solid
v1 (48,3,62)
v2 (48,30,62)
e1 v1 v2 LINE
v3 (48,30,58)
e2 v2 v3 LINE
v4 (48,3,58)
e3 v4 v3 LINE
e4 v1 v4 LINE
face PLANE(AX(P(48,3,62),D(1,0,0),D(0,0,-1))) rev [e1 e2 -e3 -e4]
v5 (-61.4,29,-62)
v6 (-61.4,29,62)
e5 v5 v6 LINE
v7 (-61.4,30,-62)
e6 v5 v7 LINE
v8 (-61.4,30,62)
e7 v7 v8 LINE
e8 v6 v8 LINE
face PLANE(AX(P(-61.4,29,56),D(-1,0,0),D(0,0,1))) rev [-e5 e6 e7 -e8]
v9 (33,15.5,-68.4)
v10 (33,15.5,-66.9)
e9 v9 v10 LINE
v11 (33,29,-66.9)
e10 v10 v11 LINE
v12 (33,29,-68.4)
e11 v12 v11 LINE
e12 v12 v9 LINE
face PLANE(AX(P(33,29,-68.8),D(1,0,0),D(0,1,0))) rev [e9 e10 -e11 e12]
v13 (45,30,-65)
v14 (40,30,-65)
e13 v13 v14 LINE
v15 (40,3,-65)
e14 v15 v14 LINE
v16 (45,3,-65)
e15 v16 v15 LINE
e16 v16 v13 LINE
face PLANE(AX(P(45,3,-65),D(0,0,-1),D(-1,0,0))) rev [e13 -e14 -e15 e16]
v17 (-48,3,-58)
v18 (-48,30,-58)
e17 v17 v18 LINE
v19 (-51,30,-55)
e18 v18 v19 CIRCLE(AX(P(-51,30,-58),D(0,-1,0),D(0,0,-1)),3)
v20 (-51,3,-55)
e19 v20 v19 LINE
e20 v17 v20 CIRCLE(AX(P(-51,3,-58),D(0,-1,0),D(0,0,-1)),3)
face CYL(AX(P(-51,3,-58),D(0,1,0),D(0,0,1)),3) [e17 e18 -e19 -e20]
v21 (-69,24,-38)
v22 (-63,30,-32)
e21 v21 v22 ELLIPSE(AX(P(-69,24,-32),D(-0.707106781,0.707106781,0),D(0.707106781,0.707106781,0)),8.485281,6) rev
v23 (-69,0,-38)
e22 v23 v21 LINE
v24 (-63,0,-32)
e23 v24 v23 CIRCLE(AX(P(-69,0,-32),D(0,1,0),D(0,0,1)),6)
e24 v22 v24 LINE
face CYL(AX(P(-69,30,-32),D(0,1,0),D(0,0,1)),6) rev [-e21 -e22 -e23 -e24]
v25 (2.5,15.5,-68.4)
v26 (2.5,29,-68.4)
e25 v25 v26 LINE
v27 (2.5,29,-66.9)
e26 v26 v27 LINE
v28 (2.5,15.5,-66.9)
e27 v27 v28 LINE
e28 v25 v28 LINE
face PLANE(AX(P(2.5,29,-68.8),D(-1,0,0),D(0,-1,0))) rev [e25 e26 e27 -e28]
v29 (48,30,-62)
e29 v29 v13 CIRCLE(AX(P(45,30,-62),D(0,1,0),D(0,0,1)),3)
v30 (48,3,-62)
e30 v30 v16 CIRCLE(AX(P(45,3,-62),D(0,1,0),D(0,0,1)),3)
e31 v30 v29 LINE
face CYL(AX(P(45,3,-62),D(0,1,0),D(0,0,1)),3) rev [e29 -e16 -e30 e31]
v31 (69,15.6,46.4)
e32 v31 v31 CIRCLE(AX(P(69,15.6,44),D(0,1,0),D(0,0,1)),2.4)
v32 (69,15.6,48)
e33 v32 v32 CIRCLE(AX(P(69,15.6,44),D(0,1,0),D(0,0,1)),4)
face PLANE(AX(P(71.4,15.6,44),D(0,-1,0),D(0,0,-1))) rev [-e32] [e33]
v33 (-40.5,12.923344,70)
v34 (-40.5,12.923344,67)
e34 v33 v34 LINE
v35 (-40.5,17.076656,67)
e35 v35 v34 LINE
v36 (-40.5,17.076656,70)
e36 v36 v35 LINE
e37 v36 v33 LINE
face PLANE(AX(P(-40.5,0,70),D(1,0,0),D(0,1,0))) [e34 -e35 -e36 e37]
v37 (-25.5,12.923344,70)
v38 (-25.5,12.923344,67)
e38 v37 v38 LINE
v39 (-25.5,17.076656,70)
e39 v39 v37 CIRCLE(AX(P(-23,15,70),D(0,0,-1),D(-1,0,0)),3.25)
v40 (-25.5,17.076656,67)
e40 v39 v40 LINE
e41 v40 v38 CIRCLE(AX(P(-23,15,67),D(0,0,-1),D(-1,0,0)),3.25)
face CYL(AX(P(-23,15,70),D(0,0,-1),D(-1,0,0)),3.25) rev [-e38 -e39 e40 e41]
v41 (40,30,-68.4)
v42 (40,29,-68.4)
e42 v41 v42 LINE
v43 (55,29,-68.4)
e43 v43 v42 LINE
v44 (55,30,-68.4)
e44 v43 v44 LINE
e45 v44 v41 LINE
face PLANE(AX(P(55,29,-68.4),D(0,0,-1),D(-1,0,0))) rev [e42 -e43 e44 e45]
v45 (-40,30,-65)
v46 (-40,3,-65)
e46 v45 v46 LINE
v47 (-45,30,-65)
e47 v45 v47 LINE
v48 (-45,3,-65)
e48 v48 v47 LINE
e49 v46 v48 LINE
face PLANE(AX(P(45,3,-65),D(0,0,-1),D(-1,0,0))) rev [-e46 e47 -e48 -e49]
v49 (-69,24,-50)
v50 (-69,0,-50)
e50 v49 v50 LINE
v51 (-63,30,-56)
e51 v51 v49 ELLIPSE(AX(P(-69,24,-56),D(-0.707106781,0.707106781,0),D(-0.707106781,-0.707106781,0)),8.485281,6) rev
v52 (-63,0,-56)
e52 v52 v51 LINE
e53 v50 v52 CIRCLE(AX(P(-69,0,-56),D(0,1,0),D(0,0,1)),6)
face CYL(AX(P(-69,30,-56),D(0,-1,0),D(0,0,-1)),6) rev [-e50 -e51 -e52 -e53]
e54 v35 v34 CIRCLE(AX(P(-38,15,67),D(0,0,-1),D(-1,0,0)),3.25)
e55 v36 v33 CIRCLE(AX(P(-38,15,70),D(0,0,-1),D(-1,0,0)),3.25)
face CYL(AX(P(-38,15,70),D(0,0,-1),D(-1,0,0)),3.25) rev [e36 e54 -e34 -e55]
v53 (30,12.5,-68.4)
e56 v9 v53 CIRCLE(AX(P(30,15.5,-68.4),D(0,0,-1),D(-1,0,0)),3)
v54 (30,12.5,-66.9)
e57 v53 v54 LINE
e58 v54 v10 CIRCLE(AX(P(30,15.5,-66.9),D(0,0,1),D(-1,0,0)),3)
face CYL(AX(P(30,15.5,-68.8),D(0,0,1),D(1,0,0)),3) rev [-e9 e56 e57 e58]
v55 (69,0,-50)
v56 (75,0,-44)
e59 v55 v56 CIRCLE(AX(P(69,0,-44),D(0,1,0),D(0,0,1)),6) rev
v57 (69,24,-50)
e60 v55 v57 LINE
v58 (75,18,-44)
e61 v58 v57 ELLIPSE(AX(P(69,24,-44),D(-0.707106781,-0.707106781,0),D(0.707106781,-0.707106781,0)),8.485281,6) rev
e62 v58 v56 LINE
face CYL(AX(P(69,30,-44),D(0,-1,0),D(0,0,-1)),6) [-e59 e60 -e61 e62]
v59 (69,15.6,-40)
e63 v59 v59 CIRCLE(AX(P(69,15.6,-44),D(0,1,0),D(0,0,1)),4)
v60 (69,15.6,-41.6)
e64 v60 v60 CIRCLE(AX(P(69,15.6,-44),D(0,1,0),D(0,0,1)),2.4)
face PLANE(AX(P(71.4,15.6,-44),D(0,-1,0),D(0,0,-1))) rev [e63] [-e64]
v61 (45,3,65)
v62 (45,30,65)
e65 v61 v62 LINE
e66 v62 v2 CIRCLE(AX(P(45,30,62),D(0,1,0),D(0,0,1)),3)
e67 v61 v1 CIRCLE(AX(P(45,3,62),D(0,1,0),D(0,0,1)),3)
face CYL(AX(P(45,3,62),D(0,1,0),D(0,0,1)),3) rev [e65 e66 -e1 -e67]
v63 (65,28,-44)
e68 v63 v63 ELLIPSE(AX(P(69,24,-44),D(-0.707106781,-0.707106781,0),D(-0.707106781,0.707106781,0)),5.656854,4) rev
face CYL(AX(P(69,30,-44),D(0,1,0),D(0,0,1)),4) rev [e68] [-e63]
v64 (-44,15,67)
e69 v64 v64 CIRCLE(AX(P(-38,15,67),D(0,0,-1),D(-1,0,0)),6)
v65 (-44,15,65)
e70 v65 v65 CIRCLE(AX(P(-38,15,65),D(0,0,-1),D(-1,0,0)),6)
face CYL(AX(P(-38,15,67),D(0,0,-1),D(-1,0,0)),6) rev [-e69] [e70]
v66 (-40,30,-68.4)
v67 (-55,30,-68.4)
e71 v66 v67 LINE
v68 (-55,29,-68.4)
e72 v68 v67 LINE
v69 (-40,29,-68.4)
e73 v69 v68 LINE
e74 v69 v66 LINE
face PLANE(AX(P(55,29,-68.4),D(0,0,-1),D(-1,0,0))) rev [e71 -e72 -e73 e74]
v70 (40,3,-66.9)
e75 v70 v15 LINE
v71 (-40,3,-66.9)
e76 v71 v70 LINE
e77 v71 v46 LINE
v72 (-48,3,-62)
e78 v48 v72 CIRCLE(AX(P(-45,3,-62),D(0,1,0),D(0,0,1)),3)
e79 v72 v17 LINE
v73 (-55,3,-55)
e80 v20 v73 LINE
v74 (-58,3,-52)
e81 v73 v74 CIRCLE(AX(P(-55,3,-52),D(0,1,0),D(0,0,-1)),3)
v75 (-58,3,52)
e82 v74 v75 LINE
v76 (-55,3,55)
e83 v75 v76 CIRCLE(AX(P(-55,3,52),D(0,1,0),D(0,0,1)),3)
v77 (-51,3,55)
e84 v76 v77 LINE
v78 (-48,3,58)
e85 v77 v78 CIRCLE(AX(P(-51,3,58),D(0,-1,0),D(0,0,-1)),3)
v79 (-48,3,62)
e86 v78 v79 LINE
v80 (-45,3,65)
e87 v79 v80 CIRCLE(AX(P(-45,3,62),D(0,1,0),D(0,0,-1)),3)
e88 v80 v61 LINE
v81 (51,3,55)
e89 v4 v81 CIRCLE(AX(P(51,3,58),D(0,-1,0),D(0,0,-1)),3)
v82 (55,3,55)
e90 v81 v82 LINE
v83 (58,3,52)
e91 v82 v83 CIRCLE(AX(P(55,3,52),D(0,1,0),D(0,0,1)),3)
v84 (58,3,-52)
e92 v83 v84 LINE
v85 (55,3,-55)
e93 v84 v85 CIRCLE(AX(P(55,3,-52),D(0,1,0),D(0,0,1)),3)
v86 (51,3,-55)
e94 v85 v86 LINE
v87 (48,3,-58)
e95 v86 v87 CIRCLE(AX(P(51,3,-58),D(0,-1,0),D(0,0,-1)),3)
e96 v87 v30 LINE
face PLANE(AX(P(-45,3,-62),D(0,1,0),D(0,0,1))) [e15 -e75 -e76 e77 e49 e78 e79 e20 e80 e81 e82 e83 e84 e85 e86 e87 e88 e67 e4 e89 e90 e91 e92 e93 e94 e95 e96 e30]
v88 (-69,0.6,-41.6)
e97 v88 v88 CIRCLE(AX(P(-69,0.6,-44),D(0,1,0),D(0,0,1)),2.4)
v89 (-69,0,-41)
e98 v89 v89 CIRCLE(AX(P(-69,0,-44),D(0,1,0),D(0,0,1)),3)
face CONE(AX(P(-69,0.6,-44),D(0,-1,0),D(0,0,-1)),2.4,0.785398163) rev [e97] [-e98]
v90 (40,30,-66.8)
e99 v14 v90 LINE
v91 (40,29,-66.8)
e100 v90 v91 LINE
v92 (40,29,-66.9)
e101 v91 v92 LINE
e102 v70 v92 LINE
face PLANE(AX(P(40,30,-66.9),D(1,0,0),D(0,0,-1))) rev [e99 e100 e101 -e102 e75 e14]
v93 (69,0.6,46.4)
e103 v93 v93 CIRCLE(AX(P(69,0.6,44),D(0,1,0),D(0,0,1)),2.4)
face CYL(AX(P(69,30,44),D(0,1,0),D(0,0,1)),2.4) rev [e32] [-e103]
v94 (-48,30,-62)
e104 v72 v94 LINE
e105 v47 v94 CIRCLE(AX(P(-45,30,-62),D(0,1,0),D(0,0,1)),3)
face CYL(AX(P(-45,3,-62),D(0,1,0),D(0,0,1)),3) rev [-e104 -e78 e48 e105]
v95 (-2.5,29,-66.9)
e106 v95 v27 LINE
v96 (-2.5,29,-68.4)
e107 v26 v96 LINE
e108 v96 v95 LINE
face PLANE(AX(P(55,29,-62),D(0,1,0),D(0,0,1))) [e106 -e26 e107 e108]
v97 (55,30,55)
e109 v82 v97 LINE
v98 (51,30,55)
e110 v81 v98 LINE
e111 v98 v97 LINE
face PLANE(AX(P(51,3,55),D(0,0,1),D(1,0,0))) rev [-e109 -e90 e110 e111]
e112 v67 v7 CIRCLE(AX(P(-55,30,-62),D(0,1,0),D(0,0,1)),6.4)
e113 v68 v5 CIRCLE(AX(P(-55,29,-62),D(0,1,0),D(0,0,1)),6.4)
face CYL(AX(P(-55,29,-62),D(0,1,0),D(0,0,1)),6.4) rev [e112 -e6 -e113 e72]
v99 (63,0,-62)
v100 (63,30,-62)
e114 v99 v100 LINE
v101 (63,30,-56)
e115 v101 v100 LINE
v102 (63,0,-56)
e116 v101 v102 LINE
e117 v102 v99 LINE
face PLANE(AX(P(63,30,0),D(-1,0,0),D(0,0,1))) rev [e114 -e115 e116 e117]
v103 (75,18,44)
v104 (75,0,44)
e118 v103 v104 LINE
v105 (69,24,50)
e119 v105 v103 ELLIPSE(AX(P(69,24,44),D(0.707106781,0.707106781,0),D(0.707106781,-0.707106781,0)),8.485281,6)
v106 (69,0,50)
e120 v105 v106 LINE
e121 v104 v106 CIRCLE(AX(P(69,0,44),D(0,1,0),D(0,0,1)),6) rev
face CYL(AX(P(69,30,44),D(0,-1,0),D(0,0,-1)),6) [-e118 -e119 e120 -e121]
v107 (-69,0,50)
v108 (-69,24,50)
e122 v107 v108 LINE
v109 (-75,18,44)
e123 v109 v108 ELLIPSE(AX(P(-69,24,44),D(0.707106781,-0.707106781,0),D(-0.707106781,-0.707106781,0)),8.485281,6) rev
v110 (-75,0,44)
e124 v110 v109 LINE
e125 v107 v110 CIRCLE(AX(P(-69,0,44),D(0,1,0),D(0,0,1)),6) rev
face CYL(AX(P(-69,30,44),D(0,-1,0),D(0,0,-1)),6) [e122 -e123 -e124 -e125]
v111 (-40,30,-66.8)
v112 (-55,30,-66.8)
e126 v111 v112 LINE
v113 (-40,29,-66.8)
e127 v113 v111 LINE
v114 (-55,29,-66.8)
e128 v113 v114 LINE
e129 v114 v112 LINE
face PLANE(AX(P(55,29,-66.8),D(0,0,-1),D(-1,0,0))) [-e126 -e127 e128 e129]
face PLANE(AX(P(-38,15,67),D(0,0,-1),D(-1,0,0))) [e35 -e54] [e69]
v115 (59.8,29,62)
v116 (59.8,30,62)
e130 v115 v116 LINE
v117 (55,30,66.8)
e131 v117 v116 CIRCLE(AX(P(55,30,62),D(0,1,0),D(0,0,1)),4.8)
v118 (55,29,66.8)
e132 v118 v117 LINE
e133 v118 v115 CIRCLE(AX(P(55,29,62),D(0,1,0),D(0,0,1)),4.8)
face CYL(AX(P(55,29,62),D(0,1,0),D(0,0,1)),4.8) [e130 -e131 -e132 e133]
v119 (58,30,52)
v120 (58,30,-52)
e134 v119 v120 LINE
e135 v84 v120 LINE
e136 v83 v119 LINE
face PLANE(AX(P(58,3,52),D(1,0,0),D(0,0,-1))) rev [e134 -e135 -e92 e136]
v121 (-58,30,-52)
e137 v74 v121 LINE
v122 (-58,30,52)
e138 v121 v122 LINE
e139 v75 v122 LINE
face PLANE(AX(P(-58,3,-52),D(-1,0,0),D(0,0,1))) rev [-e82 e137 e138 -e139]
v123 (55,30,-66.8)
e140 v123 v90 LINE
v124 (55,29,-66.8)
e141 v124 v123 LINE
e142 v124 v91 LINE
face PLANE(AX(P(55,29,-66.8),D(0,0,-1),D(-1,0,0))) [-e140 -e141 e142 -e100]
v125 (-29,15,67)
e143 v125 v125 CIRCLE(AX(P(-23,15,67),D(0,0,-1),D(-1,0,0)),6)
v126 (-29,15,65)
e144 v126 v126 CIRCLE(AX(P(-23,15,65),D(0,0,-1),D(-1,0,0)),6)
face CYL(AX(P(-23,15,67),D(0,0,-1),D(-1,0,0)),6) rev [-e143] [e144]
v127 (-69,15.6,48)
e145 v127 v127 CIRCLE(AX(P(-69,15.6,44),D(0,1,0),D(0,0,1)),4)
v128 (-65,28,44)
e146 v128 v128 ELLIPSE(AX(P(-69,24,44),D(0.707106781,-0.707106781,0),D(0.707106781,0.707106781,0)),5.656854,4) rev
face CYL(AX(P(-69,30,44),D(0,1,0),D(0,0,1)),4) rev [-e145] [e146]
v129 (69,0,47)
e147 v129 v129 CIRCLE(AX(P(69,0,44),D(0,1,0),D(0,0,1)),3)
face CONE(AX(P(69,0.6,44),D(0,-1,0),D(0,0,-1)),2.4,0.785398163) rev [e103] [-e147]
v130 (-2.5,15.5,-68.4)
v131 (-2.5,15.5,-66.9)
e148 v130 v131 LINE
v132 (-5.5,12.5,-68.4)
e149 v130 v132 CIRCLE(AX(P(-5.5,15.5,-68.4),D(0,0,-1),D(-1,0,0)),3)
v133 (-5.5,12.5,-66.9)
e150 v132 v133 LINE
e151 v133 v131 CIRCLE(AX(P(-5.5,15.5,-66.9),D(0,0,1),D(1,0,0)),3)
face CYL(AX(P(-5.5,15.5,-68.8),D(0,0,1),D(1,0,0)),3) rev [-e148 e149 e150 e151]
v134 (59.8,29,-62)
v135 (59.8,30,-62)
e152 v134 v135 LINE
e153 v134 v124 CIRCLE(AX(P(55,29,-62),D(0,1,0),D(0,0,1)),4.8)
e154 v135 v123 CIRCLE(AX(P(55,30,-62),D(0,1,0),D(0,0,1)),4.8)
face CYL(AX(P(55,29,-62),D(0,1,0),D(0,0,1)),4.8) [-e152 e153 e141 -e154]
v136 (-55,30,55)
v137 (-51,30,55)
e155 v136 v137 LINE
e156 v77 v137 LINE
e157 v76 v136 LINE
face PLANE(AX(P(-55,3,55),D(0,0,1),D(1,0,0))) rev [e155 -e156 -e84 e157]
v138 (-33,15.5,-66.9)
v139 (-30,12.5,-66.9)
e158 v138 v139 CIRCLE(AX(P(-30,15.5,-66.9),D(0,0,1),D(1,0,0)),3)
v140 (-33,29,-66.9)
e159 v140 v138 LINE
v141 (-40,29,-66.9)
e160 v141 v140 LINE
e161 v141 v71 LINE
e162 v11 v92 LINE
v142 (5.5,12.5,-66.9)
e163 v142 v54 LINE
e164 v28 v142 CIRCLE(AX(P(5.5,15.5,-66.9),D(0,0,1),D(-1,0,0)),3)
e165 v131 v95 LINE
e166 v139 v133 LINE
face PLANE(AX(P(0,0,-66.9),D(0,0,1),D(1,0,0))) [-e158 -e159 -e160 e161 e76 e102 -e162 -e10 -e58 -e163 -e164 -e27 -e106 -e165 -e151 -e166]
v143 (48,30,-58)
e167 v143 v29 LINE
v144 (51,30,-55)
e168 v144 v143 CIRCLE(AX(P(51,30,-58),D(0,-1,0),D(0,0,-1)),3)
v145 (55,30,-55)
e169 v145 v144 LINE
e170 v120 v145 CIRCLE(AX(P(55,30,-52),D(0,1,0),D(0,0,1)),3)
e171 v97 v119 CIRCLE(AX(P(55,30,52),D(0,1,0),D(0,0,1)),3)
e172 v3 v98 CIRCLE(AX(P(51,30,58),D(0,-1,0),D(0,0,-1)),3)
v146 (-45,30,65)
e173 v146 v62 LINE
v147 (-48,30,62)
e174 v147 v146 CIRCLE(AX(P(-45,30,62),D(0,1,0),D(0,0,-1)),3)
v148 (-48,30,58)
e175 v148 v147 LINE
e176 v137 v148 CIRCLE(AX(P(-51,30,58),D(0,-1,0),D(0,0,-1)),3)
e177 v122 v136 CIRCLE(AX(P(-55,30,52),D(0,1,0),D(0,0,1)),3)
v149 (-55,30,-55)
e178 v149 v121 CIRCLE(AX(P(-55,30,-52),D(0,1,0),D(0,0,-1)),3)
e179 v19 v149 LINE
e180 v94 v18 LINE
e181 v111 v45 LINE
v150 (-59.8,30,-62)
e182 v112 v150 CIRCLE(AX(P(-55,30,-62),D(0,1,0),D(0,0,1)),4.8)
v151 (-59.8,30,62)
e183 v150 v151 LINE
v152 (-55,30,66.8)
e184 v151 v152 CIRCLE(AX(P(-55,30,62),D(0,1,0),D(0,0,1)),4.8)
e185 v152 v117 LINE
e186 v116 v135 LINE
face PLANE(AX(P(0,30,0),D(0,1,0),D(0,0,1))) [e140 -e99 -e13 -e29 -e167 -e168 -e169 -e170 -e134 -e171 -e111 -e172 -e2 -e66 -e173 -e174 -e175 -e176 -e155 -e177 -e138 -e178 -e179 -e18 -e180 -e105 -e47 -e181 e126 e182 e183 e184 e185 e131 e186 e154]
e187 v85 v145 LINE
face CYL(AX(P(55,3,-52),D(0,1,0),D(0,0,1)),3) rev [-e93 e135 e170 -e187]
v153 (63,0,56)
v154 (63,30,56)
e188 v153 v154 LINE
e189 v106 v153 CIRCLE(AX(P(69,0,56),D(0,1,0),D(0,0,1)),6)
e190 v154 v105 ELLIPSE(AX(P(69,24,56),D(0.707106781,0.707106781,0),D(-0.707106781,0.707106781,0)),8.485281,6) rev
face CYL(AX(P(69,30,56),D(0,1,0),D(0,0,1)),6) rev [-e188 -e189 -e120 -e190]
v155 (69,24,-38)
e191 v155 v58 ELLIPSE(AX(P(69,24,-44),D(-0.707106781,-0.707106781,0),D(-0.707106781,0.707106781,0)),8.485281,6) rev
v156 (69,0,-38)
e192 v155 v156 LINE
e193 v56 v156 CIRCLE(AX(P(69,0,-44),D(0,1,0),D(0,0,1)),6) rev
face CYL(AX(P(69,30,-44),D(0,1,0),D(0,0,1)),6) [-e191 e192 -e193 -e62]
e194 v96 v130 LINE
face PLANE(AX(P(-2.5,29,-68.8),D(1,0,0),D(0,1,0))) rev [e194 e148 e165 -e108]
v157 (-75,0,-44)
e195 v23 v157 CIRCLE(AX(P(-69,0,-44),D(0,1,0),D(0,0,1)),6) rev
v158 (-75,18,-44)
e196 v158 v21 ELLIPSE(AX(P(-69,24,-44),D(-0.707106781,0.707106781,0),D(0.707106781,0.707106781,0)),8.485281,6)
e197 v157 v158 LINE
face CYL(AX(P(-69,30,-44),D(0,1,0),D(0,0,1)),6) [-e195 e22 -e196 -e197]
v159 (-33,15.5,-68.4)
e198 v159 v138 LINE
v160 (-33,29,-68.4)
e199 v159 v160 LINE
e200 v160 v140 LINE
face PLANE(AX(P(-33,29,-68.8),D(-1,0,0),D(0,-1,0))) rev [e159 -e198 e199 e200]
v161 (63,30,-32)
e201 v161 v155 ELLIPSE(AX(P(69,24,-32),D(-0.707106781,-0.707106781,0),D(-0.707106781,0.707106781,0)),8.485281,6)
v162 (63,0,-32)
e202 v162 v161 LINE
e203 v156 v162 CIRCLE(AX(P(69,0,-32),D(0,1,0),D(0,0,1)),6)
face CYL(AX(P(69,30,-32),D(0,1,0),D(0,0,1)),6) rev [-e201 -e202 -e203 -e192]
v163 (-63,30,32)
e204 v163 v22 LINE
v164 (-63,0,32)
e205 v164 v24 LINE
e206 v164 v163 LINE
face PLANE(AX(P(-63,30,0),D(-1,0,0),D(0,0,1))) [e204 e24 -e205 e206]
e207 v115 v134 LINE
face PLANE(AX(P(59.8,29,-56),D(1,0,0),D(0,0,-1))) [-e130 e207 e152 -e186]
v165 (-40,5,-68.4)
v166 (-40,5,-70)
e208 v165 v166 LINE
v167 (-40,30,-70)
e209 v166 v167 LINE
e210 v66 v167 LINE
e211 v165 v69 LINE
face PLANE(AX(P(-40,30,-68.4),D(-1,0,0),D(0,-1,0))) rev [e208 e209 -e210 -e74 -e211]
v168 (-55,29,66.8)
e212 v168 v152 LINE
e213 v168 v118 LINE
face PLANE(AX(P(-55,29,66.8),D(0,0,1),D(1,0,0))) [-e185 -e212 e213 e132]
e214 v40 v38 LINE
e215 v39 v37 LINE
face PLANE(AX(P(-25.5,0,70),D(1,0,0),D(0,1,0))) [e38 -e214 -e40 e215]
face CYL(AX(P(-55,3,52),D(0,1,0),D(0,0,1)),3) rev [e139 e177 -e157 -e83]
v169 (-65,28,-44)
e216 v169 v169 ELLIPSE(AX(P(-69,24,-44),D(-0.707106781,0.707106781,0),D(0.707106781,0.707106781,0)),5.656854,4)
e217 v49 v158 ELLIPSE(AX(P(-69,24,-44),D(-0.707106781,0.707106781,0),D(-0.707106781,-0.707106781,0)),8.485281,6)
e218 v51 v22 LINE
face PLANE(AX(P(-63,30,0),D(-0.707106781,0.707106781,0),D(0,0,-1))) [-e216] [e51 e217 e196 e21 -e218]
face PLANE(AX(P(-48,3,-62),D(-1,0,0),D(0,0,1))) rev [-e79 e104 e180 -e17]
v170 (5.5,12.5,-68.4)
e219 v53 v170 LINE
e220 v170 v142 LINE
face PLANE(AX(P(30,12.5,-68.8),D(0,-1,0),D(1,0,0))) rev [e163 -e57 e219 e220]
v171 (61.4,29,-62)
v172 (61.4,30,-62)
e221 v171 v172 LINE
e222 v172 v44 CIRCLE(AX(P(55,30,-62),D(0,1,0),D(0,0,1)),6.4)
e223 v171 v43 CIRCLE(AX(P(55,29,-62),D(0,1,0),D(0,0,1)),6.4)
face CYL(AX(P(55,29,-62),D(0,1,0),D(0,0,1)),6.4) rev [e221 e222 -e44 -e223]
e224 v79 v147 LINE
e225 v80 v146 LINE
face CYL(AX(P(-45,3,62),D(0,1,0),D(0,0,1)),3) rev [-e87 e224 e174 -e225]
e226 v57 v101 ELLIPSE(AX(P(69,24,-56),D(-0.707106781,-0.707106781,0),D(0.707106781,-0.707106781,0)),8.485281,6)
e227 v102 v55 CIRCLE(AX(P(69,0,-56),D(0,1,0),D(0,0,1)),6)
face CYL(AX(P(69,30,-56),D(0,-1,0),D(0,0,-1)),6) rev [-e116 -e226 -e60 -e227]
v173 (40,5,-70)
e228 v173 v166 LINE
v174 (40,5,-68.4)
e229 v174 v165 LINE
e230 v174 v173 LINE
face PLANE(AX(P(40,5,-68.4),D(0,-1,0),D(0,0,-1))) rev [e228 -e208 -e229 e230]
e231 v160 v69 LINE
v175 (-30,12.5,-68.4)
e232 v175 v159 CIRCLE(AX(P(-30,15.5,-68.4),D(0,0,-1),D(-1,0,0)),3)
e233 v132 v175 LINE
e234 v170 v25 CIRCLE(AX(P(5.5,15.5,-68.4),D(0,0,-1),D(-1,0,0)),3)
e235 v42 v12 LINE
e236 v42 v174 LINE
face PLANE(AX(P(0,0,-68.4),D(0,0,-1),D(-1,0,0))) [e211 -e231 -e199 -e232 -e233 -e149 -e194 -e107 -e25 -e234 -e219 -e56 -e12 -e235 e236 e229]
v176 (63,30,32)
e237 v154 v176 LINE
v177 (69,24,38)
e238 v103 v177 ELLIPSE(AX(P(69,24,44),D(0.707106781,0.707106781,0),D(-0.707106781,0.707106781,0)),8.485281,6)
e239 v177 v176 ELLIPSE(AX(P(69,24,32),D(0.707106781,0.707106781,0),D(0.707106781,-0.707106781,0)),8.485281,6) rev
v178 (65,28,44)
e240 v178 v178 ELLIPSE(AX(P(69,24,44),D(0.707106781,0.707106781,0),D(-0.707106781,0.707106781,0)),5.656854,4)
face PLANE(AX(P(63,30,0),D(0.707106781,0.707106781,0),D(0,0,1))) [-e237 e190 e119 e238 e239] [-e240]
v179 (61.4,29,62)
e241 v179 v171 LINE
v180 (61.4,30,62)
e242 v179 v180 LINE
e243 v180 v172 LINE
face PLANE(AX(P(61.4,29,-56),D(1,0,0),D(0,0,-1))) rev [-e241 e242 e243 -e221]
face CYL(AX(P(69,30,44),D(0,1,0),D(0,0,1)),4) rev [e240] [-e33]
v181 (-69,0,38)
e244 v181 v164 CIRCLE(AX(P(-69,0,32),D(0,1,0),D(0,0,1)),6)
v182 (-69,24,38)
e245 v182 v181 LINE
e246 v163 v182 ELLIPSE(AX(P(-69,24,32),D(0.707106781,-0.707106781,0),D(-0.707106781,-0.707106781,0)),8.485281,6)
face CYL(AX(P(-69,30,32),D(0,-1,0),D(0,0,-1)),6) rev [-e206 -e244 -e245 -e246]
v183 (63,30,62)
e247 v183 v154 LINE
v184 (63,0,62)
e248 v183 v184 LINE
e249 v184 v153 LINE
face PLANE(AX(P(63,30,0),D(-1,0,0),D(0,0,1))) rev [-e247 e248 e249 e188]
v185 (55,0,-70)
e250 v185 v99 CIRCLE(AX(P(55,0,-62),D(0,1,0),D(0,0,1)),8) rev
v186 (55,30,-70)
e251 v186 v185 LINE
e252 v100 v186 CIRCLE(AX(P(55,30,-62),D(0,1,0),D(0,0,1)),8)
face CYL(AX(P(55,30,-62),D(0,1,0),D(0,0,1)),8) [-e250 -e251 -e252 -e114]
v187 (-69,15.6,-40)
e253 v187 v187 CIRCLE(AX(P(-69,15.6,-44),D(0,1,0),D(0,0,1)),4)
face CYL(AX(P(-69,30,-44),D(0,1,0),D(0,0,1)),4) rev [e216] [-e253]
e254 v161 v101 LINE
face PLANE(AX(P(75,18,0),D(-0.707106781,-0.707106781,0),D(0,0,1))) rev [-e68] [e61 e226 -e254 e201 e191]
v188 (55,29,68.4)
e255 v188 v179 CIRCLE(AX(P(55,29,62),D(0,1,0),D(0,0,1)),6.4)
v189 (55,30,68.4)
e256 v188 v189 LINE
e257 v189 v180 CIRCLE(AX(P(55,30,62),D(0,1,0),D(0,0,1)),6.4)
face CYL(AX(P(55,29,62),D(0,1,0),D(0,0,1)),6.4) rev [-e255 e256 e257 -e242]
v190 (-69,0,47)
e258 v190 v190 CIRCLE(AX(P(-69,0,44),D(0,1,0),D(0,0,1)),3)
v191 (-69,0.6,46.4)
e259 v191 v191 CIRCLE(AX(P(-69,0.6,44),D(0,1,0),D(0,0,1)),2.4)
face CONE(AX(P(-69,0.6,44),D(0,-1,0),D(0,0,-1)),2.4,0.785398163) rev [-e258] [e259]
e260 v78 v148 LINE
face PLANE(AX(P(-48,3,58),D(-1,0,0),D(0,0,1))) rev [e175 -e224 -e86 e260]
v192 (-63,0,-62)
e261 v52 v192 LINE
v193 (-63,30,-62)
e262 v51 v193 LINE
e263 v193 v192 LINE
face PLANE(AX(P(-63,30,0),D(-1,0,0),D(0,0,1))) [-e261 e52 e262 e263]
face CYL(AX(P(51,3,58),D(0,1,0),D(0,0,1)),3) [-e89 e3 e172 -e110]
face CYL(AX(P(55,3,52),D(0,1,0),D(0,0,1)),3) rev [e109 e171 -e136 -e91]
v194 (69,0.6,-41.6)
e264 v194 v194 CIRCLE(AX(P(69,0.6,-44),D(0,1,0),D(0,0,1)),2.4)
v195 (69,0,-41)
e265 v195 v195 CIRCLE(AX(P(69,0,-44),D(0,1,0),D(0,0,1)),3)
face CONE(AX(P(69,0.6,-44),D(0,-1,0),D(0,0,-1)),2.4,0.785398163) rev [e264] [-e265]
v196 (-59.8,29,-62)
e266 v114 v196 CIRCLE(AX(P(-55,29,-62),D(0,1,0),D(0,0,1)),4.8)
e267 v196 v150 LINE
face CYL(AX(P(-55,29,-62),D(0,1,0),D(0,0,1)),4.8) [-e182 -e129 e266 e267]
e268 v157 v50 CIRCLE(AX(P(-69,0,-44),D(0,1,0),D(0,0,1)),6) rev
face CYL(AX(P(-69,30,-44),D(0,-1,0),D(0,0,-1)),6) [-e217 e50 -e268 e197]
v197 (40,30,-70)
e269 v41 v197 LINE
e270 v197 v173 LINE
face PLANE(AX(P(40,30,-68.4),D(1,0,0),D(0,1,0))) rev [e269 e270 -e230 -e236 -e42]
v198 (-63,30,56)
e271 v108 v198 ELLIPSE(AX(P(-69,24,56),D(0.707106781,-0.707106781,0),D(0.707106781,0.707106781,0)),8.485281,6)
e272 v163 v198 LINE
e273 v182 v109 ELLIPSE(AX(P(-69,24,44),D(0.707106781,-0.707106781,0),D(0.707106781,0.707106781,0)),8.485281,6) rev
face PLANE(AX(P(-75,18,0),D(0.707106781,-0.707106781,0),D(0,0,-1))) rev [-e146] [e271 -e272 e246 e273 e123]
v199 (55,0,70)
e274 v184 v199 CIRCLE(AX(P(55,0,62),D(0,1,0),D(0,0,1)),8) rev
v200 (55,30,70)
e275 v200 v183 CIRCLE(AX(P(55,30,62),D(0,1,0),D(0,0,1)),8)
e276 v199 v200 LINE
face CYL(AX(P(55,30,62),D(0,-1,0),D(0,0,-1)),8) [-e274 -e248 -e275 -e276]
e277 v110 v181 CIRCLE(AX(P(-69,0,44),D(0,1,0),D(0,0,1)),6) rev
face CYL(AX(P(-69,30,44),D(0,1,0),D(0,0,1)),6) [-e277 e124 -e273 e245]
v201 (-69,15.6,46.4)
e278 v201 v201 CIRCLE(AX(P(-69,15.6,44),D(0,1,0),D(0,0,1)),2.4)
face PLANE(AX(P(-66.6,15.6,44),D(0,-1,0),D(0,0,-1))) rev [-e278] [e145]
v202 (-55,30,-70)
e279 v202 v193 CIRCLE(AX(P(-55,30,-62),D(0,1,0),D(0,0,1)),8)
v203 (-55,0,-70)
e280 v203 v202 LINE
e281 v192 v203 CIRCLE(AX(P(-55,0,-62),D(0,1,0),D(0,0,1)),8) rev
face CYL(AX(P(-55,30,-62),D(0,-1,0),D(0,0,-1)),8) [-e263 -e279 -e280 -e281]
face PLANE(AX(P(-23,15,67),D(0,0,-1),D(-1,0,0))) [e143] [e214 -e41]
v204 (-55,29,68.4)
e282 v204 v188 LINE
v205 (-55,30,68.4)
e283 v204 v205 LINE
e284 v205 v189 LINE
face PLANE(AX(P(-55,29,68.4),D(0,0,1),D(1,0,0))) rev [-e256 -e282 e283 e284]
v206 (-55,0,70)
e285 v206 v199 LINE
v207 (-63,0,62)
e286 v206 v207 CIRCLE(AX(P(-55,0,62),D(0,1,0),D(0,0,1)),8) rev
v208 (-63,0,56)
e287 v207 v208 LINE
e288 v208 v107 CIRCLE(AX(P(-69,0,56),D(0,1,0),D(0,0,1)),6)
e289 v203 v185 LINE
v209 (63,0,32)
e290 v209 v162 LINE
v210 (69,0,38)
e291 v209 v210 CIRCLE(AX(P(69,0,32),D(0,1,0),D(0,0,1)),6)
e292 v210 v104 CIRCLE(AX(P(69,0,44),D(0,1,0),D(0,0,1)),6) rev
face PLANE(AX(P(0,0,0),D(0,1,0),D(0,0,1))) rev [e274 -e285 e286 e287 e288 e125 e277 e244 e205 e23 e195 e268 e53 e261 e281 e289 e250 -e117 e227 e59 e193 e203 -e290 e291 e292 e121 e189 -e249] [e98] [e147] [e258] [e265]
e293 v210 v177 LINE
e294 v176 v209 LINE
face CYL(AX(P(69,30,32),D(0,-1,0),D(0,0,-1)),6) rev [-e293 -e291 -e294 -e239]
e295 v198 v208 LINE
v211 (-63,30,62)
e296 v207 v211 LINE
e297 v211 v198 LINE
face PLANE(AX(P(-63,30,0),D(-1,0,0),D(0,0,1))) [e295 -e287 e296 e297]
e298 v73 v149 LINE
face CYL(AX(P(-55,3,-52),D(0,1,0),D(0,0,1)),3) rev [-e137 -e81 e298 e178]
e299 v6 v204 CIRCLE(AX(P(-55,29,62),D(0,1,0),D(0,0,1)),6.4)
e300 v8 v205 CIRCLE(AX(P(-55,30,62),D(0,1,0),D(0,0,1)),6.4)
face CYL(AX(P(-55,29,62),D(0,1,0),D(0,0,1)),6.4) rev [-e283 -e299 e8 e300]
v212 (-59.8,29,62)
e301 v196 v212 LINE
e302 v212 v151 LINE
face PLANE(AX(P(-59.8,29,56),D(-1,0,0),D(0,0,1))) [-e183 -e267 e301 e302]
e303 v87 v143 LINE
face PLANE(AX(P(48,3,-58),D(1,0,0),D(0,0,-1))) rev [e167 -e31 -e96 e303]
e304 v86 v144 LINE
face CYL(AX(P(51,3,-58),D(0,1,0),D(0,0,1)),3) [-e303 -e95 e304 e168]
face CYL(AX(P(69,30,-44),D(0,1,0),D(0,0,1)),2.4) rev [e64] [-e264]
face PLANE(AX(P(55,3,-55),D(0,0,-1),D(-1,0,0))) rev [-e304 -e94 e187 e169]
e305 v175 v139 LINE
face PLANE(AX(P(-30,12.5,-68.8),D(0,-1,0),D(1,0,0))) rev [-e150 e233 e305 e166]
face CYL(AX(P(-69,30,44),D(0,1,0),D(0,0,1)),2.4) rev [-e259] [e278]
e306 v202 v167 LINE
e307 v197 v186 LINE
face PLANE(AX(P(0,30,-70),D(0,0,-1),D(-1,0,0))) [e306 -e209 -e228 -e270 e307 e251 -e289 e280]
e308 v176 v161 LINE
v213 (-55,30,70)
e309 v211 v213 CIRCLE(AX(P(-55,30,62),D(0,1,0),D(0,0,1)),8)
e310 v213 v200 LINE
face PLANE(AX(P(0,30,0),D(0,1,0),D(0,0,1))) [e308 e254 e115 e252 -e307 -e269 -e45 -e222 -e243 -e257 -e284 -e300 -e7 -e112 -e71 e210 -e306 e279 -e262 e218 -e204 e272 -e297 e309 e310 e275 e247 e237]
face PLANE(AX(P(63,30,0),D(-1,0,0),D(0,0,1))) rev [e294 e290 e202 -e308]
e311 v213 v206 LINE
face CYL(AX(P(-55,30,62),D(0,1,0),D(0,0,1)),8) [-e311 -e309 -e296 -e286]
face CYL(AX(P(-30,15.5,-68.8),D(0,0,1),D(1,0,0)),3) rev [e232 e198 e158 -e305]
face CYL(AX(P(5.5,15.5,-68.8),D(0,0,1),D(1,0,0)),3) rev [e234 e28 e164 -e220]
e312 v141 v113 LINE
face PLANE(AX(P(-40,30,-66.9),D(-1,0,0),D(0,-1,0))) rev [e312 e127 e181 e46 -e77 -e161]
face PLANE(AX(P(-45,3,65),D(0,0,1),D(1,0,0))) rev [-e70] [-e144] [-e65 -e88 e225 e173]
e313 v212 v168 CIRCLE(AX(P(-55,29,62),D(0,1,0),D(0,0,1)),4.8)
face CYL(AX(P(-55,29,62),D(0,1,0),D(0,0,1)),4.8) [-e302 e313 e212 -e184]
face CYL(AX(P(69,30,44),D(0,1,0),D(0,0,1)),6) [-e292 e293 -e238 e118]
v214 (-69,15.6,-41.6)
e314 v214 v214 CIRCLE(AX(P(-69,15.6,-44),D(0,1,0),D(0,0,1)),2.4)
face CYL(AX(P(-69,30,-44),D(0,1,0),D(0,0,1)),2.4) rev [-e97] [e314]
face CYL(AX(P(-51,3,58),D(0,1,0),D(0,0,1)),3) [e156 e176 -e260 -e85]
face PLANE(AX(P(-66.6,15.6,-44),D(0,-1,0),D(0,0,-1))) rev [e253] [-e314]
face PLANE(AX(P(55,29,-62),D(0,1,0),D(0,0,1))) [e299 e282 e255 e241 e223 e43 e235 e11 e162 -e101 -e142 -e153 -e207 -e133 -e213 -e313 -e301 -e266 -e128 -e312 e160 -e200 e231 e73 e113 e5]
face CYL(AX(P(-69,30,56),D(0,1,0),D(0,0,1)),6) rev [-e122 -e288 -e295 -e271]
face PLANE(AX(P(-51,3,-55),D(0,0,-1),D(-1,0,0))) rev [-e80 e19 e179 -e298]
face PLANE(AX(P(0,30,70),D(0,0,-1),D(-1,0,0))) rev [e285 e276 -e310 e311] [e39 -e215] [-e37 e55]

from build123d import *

# Parameters (mm, degrees)
SKETCH1_W                                    = 12
SKETCH1_H                                    = 12
SKETCH1_W_2                                  = 126
SKETCH1_H_2                                  = 140
BOSS_EXTRUDE2_DEPTH                          = 30
CBORE_FOR_M4_HEX_SOCKET_HEAD_CAP_SCR_2_COUNT = 2
CBORE_FOR_M4_HEX_SOCKET_HEAD_CAP_SCR_2_PITCH = 138
CBORE_FOR_M4_HEX_SOCKET_HEAD_CAP_SCR_3_COUNT = 2
CBORE_FOR_M4_HEX_SOCKET_HEAD_CAP_SCR_3_PITCH = 163.670400501
CBORE_FOR_M4_HEX_SOCKET_HEAD_CAP_SCR_4_COUNT = 2
CBORE_FOR_M4_HEX_SOCKET_HEAD_CAP_SCR_4_PITCH = 88
CHAMFER1_SIZE                                = 12
FILLET1_R                                    = 8
FILLET2_R                                    = 6
CUT_EXTRUDE2_DEPTH                           = 27
CUT_EXTRUDE3_DEPTH                           = 1
SKETCH11_W                                   = 80
SKETCH11_H                                   = 25
CUT_EXTRUDE4_DEPTH                           = 1.6
SKETCH12_W                                   = 80
SKETCH12_H                                   = 27
CUT_EXTRUDE5_DEPTH                           = 1.9
CUT_EXTRUDE6_DEPTH                           = 1.9
SKETCH14_R                                   = 6
CUT_EXTRUDE8_DEPTH                           = 2
CUT_EXTRUDE9_DEPTH                           = 3


# Some blends are built 0.0001 mm under size
with BuildPart() as part:
    # Sketch1 → Boss-Extrude2 (new body)
    with BuildSketch(Plane(origin=(0, 0, 0), x_dir=(1, 0, 0), z_dir=(0, 1, 0))):
        with Locations((-69, -44)):
            Rectangle(SKETCH1_W, SKETCH1_H)
        Rectangle(SKETCH1_W_2, SKETCH1_H_2)
        with Locations((-69, 44)):
            Rectangle(SKETCH1_W, SKETCH1_H)
        with Locations((69, 44)):
            Rectangle(SKETCH1_W, SKETCH1_H)
        with Locations((69, -44)):
            Rectangle(SKETCH1_W, SKETCH1_H)
    extrude(amount=BOSS_EXTRUDE2_DEPTH)

    # Sketch3 → CBORE for M4 Hex Socket Head Cap Screw1 (revolve, cut)
    with BuildSketch(Plane(origin=(-69, 30, 44), x_dir=(0, 0, 1), z_dir=(1, 0, 0))):
        Polygon((0, 0), (0, 30), (3, 30), (2.4, 29.4), (2.4, 14.4), (4, 14.4), (4, 0), align=None)
    cbore_for_m4_hex_socket_head_cap_screw1 = revolve(axis=Axis((-69, 36.35, 44), (0, -1, 0)), mode=Mode.SUBTRACT)

    # CBORE for M4 Hex Socket Head Cap Scr 2: CBORE for M4 Hex Socket Head Cap Screw1 ×2
    with Locations(*[(i * CBORE_FOR_M4_HEX_SOCKET_HEAD_CAP_SCR_2_PITCH, 0, 0) for i in range(1, CBORE_FOR_M4_HEX_SOCKET_HEAD_CAP_SCR_2_COUNT)]):
        add(cbore_for_m4_hex_socket_head_cap_screw1, mode=Mode.SUBTRACT)

    # CBORE for M4 Hex Socket Head Cap Scr 3: CBORE for M4 Hex Socket Head Cap Screw1 ×2
    with Locations(*[Vector(0.8431579538999365, 0, -0.537665941617351) * (i * CBORE_FOR_M4_HEX_SOCKET_HEAD_CAP_SCR_3_PITCH) for i in range(1, CBORE_FOR_M4_HEX_SOCKET_HEAD_CAP_SCR_3_COUNT)]):
        add(cbore_for_m4_hex_socket_head_cap_screw1, mode=Mode.SUBTRACT)

    # CBORE for M4 Hex Socket Head Cap Scr 4: CBORE for M4 Hex Socket Head Cap Screw1 ×2
    with Locations(*[(0, 0, -i * CBORE_FOR_M4_HEX_SOCKET_HEAD_CAP_SCR_4_PITCH) for i in range(1, CBORE_FOR_M4_HEX_SOCKET_HEAD_CAP_SCR_4_COUNT)]):
        add(cbore_for_m4_hex_socket_head_cap_screw1, mode=Mode.SUBTRACT)

    # Chamfer1
    # the kernel refuses this chamfer: 12 mm, written as the material it takes off along each edge
    with BuildSketch(Plane(origin=(-75, 30, 7.139804144), x_dir=(0.9996219169112969, 0.027495876610586497, 0), z_dir=(0, 0, 1)), Plane(origin=(-75, 30, -80.860195856), x_dir=(0.9996219169112969, 0.027495876610586497, 0), z_dir=(0, 0, 1)), Plane(origin=(75, 30, -7.139804144), x_dir=(-0.9996219169112969, 0.027495876610586497, 0), z_dir=(0, 0, -1)), Plane(origin=(75, 30, 80.860195856), x_dir=(-0.9996219169112969, 0.027495876610586497, 0), z_dir=(0, 0, -1))) as chamfer1_piece_1:
        Polygon((CHAMFER1_SIZE * 0.999621916911, -CHAMFER1_SIZE * 0.0274958766106), (-CHAMFER1_SIZE * 0.0274958766106, -CHAMFER1_SIZE * 0.999621916911), (0, 0), align=None)
    extrude(amount=73.720391711, mode=Mode.SUBTRACT)

    # Fillet1
    fillet1_edges = [part.edges().sort_by_distance(p)[0] for p in [
        (-63, 15, -70),
        (63, 15, -70),
        (63, 15, 70),
        (-63, 15, 70),
    ]]
    fillet(fillet1_edges, radius=FILLET1_R)

    # Fillet2
    fillet2_edges = [part.edges().sort_by_distance(p)[0] for p in [
        (-63, 15, 38),
        (-63, 15, -38),
        (-63, 15, -50),
        (63, 15, -50),
        (63, 15, -38),
        (63, 15, 38),
        (63, 15, 50),
        (-63, 15, 50),
        (-75, 9, 50),
        (-75, 9, 38),
        (-75, 9, -38),
        (-75, 9, -50),
        (75, 9, -50),
        (75, 9, -38),
        (75, 9, 38),
        (75, 9, 50),
    ]]
    fillet(fillet2_edges, radius=FILLET2_R - 0.0001)  # a hair under: the kernel refuses the full size

    # Sketch6 → Cut-Extrude2 (cut)
    with BuildSketch(Plane(origin=(0, 30, 0), x_dir=(1, 0, 0), z_dir=(0, 1, 0))):
        with BuildLine():
            Line((-58, 52), (-58, -52))
            ThreePointArc((-58, -52), (-57.121320344, -54.121320344), (-55, -55))
            Line((-55, -55), (-51, -55))
            ThreePointArc((-51, -55), (-48.878679656, -55.878679656), (-48, -58))
            Line((-48, -58), (-48, -62))
            ThreePointArc((-48, -62), (-47.121320344, -64.121320344), (-45, -65))
            Line((-45, -65), (45, -65))
            ThreePointArc((45, -65), (47.121320344, -64.121320344), (48, -62))
            Line((48, -62), (48, -58))
            ThreePointArc((48, -58), (48.878679656, -55.878679656), (51, -55))
            Line((51, -55), (55, -55))
            ThreePointArc((55, -55), (57.121320344, -54.121320344), (58, -52))
            Line((58, -52), (58, 52))
            ThreePointArc((58, 52), (57.121320344, 54.121320344), (55, 55))
            Line((55, 55), (51, 55))
            ThreePointArc((51, 55), (48.878679656, 55.878679656), (48, 58))
            Line((48, 58), (48, 62))
            ThreePointArc((48, 62), (47.121320344, 64.121320344), (45, 65))
            Line((45, 65), (-45, 65))
            ThreePointArc((-45, 65), (-47.121320344, 64.121320344), (-48, 62))
            Line((-48, 62), (-48, 58))
            ThreePointArc((-48, 58), (-48.878679656, 55.878679656), (-51, 55))
            Line((-51, 55), (-55, 55))
            ThreePointArc((-55, 55), (-57.121320344, 54.121320344), (-58, 52))
        make_face()
    extrude(amount=-CUT_EXTRUDE2_DEPTH, mode=Mode.SUBTRACT)

    # Sketch7 → Cut-Extrude3 (cut)
    with BuildSketch(Plane(origin=(0, 30, 0), x_dir=(1, 0, 0), z_dir=(0, 1, 0))):
        with BuildLine():
            Line((55, 68.4), (-55, 68.4))
            ThreePointArc((-55, 68.4), (-59.5254834, 66.5254834), (-61.4, 62))
            Line((-61.4, 62), (-61.4, 56))
            Line((-61.4, 56), (-61.4, 32))
            Line((-61.4, 32), (-61.4, -32))
            Line((-61.4, -32), (-61.4, -56))
            Line((-61.4, -56), (-61.4, -62))
            ThreePointArc((-61.4, -62), (-59.5254834, -66.5254834), (-55, -68.4))
            Line((-55, -68.4), (55, -68.4))
            ThreePointArc((55, -68.4), (59.5254834, -66.5254834), (61.4, -62))
            Line((61.4, -62), (61.4, -56))
            Line((61.4, -56), (61.4, -32))
            Line((61.4, -32), (61.4, 32))
            Line((61.4, 32), (61.4, 56))
            Line((61.4, 56), (61.4, 62))
            ThreePointArc((61.4, 62), (59.5254834, 66.5254834), (55, 68.4))
        make_face()
        with BuildLine():
            Line((55, 66.8), (-55, 66.8))
            ThreePointArc((-55, 66.8), (-58.39411255, 65.39411255), (-59.8, 62))
            Line((-59.8, 62), (-59.8, 56))
            Line((-59.8, 56), (-59.8, 32))
            Line((-59.8, 32), (-59.8, -32))
            Line((-59.8, -32), (-59.8, -56))
            Line((-59.8, -56), (-59.8, -62))
            ThreePointArc((-59.8, -62), (-58.39411255, -65.39411255), (-55, -66.8))
            Line((-55, -66.8), (55, -66.8))
            ThreePointArc((55, -66.8), (58.39411255, -65.39411255), (59.8, -62))
            Line((59.8, -62), (59.8, -56))
            Line((59.8, -56), (59.8, -32))
            Line((59.8, -32), (59.8, 32))
            Line((59.8, 32), (59.8, 56))
            Line((59.8, 56), (59.8, 62))
            ThreePointArc((59.8, 62), (58.39411255, 65.39411255), (55, 66.8))
        make_face(mode=Mode.SUBTRACT)
    extrude(amount=-CUT_EXTRUDE3_DEPTH, mode=Mode.SUBTRACT)

    # Sketch11 → Cut-Extrude4 (cut)
    with BuildSketch(Plane(origin=(0, 0, -70), x_dir=(-1, 0, 0), z_dir=(0, 0, -1))):
        with Locations((0, 17.5)):
            Rectangle(SKETCH11_W, SKETCH11_H)
    extrude(amount=-CUT_EXTRUDE4_DEPTH, mode=Mode.SUBTRACT)

    # Sketch12 → Cut-Extrude5 (cut)
    with BuildSketch(Plane.XY.offset(-65)):
        with Locations((0, 16.5)):
            Rectangle(SKETCH12_W, SKETCH12_H)
    extrude(amount=-CUT_EXTRUDE5_DEPTH, mode=Mode.SUBTRACT)

    # Sketch13 → Cut-Extrude6 (cut)
    with BuildSketch(Plane.XY.offset(-66.9)):
        with BuildLine():
            Line((-33, 29), (-2.5, 29))
            Line((-2.5, 29), (-2.5, 15.5))
            ThreePointArc((-2.5, 15.5), (-3.378679656, 13.378679656), (-5.5, 12.5))
            Line((-5.5, 12.5), (-30, 12.5))
            ThreePointArc((-30, 12.5), (-32.121320344, 13.378679656), (-33, 15.5))
            Line((-33, 15.5), (-33, 29))
        make_face()
        with BuildLine():
            Line((30, 12.5), (5.5, 12.5))
            ThreePointArc((5.5, 12.5), (3.378679656, 13.378679656), (2.5, 15.5))
            Line((2.5, 15.5), (2.5, 29))
            Line((2.5, 29), (33, 29))
            Line((33, 29), (33, 15.5))
            ThreePointArc((33, 15.5), (32.121320344, 13.378679656), (30, 12.5))
        make_face()
    extrude(amount=-CUT_EXTRUDE6_DEPTH, mode=Mode.SUBTRACT)

    # Sketch14 → Cut-Extrude8 (cut)
    with BuildSketch(Plane(origin=(0, 0, 65), x_dir=(-1, 0, 0), z_dir=(0, 0, -1))):
        with Locations((38, 15)):
            Circle(SKETCH14_R)
        with Locations((23, 15)):
            Circle(SKETCH14_R)
    extrude(amount=-CUT_EXTRUDE8_DEPTH, mode=Mode.SUBTRACT)

    # Sketch16 → Cut-Extrude9 (cut)
    with BuildSketch(Plane(origin=(0, 0, 67), x_dir=(-1, 0, 0), z_dir=(0, 0, -1))):
        with BuildLine():
            Line((40.5, 12.923344034), (40.5, 17.076655966))
            ThreePointArc((40.5, 17.076655966), (34.75, 15), (40.5, 12.923344034))
        make_face()
        with BuildLine():
            Line((25.5, 12.923344034), (25.5, 17.076655966))
            ThreePointArc((25.5, 17.076655966), (19.75, 15), (25.5, 12.923344034))
        make_face()
    extrude(amount=-CUT_EXTRUDE9_DEPTH, mode=Mode.SUBTRACT)


solid = part.part
